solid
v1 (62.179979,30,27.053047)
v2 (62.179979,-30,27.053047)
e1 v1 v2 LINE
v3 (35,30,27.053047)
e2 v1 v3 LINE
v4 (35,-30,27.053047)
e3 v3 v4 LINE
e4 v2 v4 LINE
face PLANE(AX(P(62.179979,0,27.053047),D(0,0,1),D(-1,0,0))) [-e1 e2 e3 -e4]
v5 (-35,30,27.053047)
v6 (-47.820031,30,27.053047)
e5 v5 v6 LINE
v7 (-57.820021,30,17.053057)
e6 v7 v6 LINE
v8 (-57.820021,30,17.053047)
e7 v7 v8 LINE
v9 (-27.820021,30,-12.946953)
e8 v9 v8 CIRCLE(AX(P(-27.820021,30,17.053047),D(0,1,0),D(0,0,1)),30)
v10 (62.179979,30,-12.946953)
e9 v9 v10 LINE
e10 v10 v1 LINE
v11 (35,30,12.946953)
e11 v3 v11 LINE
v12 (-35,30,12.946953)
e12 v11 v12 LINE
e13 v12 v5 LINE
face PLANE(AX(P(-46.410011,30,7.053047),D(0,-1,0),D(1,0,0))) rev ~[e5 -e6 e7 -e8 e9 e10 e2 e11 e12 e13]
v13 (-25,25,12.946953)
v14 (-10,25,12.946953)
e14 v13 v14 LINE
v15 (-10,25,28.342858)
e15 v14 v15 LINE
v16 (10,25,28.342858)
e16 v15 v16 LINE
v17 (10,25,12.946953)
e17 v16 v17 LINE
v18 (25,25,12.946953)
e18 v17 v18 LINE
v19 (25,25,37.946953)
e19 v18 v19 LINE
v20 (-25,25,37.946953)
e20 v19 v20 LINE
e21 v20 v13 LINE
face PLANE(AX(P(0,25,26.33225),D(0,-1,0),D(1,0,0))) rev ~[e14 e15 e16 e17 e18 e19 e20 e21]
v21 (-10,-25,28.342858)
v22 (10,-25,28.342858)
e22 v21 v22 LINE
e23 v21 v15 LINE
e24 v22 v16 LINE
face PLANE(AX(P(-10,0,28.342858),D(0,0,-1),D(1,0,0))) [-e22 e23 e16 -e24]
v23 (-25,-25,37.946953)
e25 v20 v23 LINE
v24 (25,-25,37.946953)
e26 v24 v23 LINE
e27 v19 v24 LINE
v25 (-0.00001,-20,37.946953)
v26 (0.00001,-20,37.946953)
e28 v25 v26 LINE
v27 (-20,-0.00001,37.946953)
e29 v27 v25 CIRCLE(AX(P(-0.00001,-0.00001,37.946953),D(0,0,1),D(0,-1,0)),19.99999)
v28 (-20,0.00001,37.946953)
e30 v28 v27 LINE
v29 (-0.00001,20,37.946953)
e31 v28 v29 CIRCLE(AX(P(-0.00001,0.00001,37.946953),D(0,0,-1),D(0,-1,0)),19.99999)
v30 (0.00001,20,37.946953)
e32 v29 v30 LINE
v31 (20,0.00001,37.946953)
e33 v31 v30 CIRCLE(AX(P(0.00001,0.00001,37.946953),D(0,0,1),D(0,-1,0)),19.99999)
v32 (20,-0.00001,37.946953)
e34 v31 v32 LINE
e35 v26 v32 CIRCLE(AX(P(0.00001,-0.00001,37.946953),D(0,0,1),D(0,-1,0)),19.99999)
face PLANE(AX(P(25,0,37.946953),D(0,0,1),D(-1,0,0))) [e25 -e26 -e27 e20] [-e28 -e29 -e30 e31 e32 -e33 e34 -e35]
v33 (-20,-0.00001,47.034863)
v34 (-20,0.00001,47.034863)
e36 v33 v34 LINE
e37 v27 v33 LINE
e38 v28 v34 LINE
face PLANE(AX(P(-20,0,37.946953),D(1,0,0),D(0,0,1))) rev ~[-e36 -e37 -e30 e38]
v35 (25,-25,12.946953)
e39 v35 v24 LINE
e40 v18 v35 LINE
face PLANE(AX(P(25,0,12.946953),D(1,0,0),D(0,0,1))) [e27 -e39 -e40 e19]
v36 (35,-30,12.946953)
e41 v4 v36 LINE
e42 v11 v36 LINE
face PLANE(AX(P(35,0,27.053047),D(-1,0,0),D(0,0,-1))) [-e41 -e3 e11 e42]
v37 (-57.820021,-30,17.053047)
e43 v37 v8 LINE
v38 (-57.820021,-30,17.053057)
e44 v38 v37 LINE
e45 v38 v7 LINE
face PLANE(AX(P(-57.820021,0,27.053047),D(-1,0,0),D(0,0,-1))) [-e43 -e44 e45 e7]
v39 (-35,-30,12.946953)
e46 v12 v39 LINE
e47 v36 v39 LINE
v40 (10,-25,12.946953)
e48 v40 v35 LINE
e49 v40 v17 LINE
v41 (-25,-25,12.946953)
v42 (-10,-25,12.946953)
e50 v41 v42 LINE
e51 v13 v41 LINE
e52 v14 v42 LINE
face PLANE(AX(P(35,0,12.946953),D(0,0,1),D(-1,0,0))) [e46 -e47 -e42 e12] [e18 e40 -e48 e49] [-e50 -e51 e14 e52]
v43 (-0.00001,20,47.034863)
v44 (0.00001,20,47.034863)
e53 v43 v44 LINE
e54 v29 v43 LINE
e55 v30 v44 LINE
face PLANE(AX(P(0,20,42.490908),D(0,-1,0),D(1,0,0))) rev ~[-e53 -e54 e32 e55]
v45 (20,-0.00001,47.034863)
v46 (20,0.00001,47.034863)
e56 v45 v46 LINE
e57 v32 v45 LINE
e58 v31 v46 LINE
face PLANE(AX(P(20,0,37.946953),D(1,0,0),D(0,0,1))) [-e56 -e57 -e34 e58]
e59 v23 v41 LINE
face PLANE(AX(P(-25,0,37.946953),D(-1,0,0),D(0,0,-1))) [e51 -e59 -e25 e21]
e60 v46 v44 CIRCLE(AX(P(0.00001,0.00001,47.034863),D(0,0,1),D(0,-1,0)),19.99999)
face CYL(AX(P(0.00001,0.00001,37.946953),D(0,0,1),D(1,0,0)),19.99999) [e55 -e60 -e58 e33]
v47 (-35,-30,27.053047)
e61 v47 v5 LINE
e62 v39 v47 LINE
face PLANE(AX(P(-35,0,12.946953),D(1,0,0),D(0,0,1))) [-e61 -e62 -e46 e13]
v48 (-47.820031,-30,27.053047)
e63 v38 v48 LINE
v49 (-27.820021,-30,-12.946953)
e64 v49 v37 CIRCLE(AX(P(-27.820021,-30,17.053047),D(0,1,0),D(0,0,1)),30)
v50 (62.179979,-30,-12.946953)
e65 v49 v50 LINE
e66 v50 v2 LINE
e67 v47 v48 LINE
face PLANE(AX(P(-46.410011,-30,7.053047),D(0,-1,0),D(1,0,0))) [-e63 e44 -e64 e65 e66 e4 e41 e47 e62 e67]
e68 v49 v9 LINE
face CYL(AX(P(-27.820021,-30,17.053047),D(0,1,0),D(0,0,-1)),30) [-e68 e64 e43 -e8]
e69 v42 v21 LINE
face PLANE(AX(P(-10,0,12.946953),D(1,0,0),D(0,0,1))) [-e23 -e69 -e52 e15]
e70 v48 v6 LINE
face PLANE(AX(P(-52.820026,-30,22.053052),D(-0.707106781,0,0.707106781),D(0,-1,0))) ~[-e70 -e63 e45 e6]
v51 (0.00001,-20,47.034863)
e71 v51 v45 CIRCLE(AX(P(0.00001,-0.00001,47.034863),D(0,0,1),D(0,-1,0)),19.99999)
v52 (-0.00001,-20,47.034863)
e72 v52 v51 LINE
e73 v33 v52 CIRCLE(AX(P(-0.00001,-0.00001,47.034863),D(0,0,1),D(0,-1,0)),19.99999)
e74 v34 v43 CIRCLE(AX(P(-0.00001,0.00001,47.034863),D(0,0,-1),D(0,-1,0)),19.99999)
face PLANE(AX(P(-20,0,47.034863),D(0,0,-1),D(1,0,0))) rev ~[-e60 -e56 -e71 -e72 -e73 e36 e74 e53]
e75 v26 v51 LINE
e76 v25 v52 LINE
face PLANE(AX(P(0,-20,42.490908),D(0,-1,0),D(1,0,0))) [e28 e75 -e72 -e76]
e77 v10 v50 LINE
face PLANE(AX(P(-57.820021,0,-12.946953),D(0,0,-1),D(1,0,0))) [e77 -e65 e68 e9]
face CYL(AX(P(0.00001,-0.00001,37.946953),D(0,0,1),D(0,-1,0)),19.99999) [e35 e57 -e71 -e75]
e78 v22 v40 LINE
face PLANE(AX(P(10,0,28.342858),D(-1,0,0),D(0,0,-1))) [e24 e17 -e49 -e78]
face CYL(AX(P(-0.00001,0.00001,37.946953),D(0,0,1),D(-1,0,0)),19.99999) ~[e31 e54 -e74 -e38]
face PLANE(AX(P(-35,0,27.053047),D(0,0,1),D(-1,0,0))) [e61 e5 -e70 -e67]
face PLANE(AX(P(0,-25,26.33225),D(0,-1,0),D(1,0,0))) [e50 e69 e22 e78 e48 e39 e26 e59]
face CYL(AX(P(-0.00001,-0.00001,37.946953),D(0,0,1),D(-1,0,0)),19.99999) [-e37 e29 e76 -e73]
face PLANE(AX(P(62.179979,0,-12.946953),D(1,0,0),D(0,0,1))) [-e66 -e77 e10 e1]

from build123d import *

# Parameters (mm, degrees)
F1_DEPTH = 30
F2_DEPTH = 25
F0_W     = 40
F0_H     = 9.0879101008
F3_DEPTH = 20
F4_R     = 30
F5_SIZE  = 9.99999
F6_R     = 19.99999


# Not quite as in the source:
# - a fillet or chamfer is up to 0.001 mm smaller than in the source, because OpenCascade refuses the exact size


with BuildPart() as f1:
    # F0 (on Front) → F1 (new body, symmetric)
    with BuildSketch(Plane.XZ):
        Polygon((-57.820021317, -12.9469532817), (-35, -12.9469532817), (-35, 12.9469532817), (-35, 27.0530467183), (-57.820021317, 27.0530467183), align=None)
        Polygon((-35, -12.9469532817), (35, -12.9469532817), (35, 12.9469532817), (25, 12.9469532817), (10, 12.9469532817), (-10, 12.9469532817), (-25, 12.9469532817), (-35, 12.9469532817), align=None)
        Polygon((35, 12.9469532817), (35, -12.9469532817), (62.179978683, -12.9469532817), (62.179978683, 27.0530467183), (35, 27.0530467183), align=None)
    extrude(amount=F1_DEPTH, both=True)

    # F0 (on Front) → F2 (join, symmetric)
    with BuildSketch(Plane.XZ):
        Polygon((10, 12.9469532817), (25, 12.9469532817), (25, 37.9469532817), (20, 37.9469532817), (-20, 37.9469532817), (-25, 37.9469532817), (-25, 12.9469532817), (-10, 12.9469532817), (-10, 28.3428579569), (10, 28.3428579569), align=None)
    extrude(amount=F2_DEPTH, both=True)

    # F0 (on Front) → F3 (join, symmetric)
    with BuildSketch(Plane.XZ):
        with Locations((0, 42.4909083322)):
            Rectangle(F0_W, F0_H)
    extrude(amount=F3_DEPTH, both=True)

    # F4
    f4_edges = [f1.edges().sort_by_distance(p)[0] for p in [
        (-57.820021, 0, -12.946953),
    ]]
    fillet(f4_edges, radius=F4_R)

    # F5 (size 10 in the source; OpenCascade refuses exactly that, so slightly less here)
    f5_edges = [f1.edges().sort_by_distance(p)[0] for p in [
        (-57.820021, 0, 27.053047),
    ]]
    chamfer(f5_edges, length=F5_SIZE)

    # F6 (radius 20 in the source; OpenCascade refuses exactly that, so slightly less here)
    f6_edges = [f1.edges().sort_by_distance(p)[0] for p in [
        (20, -20, 42.490908),
        (20, 20, 42.490908),
        (-20, -20, 42.490908),
        (-20, 20, 42.490908),
    ]]
    fillet(f6_edges, radius=F6_R)


solid = f1.part
